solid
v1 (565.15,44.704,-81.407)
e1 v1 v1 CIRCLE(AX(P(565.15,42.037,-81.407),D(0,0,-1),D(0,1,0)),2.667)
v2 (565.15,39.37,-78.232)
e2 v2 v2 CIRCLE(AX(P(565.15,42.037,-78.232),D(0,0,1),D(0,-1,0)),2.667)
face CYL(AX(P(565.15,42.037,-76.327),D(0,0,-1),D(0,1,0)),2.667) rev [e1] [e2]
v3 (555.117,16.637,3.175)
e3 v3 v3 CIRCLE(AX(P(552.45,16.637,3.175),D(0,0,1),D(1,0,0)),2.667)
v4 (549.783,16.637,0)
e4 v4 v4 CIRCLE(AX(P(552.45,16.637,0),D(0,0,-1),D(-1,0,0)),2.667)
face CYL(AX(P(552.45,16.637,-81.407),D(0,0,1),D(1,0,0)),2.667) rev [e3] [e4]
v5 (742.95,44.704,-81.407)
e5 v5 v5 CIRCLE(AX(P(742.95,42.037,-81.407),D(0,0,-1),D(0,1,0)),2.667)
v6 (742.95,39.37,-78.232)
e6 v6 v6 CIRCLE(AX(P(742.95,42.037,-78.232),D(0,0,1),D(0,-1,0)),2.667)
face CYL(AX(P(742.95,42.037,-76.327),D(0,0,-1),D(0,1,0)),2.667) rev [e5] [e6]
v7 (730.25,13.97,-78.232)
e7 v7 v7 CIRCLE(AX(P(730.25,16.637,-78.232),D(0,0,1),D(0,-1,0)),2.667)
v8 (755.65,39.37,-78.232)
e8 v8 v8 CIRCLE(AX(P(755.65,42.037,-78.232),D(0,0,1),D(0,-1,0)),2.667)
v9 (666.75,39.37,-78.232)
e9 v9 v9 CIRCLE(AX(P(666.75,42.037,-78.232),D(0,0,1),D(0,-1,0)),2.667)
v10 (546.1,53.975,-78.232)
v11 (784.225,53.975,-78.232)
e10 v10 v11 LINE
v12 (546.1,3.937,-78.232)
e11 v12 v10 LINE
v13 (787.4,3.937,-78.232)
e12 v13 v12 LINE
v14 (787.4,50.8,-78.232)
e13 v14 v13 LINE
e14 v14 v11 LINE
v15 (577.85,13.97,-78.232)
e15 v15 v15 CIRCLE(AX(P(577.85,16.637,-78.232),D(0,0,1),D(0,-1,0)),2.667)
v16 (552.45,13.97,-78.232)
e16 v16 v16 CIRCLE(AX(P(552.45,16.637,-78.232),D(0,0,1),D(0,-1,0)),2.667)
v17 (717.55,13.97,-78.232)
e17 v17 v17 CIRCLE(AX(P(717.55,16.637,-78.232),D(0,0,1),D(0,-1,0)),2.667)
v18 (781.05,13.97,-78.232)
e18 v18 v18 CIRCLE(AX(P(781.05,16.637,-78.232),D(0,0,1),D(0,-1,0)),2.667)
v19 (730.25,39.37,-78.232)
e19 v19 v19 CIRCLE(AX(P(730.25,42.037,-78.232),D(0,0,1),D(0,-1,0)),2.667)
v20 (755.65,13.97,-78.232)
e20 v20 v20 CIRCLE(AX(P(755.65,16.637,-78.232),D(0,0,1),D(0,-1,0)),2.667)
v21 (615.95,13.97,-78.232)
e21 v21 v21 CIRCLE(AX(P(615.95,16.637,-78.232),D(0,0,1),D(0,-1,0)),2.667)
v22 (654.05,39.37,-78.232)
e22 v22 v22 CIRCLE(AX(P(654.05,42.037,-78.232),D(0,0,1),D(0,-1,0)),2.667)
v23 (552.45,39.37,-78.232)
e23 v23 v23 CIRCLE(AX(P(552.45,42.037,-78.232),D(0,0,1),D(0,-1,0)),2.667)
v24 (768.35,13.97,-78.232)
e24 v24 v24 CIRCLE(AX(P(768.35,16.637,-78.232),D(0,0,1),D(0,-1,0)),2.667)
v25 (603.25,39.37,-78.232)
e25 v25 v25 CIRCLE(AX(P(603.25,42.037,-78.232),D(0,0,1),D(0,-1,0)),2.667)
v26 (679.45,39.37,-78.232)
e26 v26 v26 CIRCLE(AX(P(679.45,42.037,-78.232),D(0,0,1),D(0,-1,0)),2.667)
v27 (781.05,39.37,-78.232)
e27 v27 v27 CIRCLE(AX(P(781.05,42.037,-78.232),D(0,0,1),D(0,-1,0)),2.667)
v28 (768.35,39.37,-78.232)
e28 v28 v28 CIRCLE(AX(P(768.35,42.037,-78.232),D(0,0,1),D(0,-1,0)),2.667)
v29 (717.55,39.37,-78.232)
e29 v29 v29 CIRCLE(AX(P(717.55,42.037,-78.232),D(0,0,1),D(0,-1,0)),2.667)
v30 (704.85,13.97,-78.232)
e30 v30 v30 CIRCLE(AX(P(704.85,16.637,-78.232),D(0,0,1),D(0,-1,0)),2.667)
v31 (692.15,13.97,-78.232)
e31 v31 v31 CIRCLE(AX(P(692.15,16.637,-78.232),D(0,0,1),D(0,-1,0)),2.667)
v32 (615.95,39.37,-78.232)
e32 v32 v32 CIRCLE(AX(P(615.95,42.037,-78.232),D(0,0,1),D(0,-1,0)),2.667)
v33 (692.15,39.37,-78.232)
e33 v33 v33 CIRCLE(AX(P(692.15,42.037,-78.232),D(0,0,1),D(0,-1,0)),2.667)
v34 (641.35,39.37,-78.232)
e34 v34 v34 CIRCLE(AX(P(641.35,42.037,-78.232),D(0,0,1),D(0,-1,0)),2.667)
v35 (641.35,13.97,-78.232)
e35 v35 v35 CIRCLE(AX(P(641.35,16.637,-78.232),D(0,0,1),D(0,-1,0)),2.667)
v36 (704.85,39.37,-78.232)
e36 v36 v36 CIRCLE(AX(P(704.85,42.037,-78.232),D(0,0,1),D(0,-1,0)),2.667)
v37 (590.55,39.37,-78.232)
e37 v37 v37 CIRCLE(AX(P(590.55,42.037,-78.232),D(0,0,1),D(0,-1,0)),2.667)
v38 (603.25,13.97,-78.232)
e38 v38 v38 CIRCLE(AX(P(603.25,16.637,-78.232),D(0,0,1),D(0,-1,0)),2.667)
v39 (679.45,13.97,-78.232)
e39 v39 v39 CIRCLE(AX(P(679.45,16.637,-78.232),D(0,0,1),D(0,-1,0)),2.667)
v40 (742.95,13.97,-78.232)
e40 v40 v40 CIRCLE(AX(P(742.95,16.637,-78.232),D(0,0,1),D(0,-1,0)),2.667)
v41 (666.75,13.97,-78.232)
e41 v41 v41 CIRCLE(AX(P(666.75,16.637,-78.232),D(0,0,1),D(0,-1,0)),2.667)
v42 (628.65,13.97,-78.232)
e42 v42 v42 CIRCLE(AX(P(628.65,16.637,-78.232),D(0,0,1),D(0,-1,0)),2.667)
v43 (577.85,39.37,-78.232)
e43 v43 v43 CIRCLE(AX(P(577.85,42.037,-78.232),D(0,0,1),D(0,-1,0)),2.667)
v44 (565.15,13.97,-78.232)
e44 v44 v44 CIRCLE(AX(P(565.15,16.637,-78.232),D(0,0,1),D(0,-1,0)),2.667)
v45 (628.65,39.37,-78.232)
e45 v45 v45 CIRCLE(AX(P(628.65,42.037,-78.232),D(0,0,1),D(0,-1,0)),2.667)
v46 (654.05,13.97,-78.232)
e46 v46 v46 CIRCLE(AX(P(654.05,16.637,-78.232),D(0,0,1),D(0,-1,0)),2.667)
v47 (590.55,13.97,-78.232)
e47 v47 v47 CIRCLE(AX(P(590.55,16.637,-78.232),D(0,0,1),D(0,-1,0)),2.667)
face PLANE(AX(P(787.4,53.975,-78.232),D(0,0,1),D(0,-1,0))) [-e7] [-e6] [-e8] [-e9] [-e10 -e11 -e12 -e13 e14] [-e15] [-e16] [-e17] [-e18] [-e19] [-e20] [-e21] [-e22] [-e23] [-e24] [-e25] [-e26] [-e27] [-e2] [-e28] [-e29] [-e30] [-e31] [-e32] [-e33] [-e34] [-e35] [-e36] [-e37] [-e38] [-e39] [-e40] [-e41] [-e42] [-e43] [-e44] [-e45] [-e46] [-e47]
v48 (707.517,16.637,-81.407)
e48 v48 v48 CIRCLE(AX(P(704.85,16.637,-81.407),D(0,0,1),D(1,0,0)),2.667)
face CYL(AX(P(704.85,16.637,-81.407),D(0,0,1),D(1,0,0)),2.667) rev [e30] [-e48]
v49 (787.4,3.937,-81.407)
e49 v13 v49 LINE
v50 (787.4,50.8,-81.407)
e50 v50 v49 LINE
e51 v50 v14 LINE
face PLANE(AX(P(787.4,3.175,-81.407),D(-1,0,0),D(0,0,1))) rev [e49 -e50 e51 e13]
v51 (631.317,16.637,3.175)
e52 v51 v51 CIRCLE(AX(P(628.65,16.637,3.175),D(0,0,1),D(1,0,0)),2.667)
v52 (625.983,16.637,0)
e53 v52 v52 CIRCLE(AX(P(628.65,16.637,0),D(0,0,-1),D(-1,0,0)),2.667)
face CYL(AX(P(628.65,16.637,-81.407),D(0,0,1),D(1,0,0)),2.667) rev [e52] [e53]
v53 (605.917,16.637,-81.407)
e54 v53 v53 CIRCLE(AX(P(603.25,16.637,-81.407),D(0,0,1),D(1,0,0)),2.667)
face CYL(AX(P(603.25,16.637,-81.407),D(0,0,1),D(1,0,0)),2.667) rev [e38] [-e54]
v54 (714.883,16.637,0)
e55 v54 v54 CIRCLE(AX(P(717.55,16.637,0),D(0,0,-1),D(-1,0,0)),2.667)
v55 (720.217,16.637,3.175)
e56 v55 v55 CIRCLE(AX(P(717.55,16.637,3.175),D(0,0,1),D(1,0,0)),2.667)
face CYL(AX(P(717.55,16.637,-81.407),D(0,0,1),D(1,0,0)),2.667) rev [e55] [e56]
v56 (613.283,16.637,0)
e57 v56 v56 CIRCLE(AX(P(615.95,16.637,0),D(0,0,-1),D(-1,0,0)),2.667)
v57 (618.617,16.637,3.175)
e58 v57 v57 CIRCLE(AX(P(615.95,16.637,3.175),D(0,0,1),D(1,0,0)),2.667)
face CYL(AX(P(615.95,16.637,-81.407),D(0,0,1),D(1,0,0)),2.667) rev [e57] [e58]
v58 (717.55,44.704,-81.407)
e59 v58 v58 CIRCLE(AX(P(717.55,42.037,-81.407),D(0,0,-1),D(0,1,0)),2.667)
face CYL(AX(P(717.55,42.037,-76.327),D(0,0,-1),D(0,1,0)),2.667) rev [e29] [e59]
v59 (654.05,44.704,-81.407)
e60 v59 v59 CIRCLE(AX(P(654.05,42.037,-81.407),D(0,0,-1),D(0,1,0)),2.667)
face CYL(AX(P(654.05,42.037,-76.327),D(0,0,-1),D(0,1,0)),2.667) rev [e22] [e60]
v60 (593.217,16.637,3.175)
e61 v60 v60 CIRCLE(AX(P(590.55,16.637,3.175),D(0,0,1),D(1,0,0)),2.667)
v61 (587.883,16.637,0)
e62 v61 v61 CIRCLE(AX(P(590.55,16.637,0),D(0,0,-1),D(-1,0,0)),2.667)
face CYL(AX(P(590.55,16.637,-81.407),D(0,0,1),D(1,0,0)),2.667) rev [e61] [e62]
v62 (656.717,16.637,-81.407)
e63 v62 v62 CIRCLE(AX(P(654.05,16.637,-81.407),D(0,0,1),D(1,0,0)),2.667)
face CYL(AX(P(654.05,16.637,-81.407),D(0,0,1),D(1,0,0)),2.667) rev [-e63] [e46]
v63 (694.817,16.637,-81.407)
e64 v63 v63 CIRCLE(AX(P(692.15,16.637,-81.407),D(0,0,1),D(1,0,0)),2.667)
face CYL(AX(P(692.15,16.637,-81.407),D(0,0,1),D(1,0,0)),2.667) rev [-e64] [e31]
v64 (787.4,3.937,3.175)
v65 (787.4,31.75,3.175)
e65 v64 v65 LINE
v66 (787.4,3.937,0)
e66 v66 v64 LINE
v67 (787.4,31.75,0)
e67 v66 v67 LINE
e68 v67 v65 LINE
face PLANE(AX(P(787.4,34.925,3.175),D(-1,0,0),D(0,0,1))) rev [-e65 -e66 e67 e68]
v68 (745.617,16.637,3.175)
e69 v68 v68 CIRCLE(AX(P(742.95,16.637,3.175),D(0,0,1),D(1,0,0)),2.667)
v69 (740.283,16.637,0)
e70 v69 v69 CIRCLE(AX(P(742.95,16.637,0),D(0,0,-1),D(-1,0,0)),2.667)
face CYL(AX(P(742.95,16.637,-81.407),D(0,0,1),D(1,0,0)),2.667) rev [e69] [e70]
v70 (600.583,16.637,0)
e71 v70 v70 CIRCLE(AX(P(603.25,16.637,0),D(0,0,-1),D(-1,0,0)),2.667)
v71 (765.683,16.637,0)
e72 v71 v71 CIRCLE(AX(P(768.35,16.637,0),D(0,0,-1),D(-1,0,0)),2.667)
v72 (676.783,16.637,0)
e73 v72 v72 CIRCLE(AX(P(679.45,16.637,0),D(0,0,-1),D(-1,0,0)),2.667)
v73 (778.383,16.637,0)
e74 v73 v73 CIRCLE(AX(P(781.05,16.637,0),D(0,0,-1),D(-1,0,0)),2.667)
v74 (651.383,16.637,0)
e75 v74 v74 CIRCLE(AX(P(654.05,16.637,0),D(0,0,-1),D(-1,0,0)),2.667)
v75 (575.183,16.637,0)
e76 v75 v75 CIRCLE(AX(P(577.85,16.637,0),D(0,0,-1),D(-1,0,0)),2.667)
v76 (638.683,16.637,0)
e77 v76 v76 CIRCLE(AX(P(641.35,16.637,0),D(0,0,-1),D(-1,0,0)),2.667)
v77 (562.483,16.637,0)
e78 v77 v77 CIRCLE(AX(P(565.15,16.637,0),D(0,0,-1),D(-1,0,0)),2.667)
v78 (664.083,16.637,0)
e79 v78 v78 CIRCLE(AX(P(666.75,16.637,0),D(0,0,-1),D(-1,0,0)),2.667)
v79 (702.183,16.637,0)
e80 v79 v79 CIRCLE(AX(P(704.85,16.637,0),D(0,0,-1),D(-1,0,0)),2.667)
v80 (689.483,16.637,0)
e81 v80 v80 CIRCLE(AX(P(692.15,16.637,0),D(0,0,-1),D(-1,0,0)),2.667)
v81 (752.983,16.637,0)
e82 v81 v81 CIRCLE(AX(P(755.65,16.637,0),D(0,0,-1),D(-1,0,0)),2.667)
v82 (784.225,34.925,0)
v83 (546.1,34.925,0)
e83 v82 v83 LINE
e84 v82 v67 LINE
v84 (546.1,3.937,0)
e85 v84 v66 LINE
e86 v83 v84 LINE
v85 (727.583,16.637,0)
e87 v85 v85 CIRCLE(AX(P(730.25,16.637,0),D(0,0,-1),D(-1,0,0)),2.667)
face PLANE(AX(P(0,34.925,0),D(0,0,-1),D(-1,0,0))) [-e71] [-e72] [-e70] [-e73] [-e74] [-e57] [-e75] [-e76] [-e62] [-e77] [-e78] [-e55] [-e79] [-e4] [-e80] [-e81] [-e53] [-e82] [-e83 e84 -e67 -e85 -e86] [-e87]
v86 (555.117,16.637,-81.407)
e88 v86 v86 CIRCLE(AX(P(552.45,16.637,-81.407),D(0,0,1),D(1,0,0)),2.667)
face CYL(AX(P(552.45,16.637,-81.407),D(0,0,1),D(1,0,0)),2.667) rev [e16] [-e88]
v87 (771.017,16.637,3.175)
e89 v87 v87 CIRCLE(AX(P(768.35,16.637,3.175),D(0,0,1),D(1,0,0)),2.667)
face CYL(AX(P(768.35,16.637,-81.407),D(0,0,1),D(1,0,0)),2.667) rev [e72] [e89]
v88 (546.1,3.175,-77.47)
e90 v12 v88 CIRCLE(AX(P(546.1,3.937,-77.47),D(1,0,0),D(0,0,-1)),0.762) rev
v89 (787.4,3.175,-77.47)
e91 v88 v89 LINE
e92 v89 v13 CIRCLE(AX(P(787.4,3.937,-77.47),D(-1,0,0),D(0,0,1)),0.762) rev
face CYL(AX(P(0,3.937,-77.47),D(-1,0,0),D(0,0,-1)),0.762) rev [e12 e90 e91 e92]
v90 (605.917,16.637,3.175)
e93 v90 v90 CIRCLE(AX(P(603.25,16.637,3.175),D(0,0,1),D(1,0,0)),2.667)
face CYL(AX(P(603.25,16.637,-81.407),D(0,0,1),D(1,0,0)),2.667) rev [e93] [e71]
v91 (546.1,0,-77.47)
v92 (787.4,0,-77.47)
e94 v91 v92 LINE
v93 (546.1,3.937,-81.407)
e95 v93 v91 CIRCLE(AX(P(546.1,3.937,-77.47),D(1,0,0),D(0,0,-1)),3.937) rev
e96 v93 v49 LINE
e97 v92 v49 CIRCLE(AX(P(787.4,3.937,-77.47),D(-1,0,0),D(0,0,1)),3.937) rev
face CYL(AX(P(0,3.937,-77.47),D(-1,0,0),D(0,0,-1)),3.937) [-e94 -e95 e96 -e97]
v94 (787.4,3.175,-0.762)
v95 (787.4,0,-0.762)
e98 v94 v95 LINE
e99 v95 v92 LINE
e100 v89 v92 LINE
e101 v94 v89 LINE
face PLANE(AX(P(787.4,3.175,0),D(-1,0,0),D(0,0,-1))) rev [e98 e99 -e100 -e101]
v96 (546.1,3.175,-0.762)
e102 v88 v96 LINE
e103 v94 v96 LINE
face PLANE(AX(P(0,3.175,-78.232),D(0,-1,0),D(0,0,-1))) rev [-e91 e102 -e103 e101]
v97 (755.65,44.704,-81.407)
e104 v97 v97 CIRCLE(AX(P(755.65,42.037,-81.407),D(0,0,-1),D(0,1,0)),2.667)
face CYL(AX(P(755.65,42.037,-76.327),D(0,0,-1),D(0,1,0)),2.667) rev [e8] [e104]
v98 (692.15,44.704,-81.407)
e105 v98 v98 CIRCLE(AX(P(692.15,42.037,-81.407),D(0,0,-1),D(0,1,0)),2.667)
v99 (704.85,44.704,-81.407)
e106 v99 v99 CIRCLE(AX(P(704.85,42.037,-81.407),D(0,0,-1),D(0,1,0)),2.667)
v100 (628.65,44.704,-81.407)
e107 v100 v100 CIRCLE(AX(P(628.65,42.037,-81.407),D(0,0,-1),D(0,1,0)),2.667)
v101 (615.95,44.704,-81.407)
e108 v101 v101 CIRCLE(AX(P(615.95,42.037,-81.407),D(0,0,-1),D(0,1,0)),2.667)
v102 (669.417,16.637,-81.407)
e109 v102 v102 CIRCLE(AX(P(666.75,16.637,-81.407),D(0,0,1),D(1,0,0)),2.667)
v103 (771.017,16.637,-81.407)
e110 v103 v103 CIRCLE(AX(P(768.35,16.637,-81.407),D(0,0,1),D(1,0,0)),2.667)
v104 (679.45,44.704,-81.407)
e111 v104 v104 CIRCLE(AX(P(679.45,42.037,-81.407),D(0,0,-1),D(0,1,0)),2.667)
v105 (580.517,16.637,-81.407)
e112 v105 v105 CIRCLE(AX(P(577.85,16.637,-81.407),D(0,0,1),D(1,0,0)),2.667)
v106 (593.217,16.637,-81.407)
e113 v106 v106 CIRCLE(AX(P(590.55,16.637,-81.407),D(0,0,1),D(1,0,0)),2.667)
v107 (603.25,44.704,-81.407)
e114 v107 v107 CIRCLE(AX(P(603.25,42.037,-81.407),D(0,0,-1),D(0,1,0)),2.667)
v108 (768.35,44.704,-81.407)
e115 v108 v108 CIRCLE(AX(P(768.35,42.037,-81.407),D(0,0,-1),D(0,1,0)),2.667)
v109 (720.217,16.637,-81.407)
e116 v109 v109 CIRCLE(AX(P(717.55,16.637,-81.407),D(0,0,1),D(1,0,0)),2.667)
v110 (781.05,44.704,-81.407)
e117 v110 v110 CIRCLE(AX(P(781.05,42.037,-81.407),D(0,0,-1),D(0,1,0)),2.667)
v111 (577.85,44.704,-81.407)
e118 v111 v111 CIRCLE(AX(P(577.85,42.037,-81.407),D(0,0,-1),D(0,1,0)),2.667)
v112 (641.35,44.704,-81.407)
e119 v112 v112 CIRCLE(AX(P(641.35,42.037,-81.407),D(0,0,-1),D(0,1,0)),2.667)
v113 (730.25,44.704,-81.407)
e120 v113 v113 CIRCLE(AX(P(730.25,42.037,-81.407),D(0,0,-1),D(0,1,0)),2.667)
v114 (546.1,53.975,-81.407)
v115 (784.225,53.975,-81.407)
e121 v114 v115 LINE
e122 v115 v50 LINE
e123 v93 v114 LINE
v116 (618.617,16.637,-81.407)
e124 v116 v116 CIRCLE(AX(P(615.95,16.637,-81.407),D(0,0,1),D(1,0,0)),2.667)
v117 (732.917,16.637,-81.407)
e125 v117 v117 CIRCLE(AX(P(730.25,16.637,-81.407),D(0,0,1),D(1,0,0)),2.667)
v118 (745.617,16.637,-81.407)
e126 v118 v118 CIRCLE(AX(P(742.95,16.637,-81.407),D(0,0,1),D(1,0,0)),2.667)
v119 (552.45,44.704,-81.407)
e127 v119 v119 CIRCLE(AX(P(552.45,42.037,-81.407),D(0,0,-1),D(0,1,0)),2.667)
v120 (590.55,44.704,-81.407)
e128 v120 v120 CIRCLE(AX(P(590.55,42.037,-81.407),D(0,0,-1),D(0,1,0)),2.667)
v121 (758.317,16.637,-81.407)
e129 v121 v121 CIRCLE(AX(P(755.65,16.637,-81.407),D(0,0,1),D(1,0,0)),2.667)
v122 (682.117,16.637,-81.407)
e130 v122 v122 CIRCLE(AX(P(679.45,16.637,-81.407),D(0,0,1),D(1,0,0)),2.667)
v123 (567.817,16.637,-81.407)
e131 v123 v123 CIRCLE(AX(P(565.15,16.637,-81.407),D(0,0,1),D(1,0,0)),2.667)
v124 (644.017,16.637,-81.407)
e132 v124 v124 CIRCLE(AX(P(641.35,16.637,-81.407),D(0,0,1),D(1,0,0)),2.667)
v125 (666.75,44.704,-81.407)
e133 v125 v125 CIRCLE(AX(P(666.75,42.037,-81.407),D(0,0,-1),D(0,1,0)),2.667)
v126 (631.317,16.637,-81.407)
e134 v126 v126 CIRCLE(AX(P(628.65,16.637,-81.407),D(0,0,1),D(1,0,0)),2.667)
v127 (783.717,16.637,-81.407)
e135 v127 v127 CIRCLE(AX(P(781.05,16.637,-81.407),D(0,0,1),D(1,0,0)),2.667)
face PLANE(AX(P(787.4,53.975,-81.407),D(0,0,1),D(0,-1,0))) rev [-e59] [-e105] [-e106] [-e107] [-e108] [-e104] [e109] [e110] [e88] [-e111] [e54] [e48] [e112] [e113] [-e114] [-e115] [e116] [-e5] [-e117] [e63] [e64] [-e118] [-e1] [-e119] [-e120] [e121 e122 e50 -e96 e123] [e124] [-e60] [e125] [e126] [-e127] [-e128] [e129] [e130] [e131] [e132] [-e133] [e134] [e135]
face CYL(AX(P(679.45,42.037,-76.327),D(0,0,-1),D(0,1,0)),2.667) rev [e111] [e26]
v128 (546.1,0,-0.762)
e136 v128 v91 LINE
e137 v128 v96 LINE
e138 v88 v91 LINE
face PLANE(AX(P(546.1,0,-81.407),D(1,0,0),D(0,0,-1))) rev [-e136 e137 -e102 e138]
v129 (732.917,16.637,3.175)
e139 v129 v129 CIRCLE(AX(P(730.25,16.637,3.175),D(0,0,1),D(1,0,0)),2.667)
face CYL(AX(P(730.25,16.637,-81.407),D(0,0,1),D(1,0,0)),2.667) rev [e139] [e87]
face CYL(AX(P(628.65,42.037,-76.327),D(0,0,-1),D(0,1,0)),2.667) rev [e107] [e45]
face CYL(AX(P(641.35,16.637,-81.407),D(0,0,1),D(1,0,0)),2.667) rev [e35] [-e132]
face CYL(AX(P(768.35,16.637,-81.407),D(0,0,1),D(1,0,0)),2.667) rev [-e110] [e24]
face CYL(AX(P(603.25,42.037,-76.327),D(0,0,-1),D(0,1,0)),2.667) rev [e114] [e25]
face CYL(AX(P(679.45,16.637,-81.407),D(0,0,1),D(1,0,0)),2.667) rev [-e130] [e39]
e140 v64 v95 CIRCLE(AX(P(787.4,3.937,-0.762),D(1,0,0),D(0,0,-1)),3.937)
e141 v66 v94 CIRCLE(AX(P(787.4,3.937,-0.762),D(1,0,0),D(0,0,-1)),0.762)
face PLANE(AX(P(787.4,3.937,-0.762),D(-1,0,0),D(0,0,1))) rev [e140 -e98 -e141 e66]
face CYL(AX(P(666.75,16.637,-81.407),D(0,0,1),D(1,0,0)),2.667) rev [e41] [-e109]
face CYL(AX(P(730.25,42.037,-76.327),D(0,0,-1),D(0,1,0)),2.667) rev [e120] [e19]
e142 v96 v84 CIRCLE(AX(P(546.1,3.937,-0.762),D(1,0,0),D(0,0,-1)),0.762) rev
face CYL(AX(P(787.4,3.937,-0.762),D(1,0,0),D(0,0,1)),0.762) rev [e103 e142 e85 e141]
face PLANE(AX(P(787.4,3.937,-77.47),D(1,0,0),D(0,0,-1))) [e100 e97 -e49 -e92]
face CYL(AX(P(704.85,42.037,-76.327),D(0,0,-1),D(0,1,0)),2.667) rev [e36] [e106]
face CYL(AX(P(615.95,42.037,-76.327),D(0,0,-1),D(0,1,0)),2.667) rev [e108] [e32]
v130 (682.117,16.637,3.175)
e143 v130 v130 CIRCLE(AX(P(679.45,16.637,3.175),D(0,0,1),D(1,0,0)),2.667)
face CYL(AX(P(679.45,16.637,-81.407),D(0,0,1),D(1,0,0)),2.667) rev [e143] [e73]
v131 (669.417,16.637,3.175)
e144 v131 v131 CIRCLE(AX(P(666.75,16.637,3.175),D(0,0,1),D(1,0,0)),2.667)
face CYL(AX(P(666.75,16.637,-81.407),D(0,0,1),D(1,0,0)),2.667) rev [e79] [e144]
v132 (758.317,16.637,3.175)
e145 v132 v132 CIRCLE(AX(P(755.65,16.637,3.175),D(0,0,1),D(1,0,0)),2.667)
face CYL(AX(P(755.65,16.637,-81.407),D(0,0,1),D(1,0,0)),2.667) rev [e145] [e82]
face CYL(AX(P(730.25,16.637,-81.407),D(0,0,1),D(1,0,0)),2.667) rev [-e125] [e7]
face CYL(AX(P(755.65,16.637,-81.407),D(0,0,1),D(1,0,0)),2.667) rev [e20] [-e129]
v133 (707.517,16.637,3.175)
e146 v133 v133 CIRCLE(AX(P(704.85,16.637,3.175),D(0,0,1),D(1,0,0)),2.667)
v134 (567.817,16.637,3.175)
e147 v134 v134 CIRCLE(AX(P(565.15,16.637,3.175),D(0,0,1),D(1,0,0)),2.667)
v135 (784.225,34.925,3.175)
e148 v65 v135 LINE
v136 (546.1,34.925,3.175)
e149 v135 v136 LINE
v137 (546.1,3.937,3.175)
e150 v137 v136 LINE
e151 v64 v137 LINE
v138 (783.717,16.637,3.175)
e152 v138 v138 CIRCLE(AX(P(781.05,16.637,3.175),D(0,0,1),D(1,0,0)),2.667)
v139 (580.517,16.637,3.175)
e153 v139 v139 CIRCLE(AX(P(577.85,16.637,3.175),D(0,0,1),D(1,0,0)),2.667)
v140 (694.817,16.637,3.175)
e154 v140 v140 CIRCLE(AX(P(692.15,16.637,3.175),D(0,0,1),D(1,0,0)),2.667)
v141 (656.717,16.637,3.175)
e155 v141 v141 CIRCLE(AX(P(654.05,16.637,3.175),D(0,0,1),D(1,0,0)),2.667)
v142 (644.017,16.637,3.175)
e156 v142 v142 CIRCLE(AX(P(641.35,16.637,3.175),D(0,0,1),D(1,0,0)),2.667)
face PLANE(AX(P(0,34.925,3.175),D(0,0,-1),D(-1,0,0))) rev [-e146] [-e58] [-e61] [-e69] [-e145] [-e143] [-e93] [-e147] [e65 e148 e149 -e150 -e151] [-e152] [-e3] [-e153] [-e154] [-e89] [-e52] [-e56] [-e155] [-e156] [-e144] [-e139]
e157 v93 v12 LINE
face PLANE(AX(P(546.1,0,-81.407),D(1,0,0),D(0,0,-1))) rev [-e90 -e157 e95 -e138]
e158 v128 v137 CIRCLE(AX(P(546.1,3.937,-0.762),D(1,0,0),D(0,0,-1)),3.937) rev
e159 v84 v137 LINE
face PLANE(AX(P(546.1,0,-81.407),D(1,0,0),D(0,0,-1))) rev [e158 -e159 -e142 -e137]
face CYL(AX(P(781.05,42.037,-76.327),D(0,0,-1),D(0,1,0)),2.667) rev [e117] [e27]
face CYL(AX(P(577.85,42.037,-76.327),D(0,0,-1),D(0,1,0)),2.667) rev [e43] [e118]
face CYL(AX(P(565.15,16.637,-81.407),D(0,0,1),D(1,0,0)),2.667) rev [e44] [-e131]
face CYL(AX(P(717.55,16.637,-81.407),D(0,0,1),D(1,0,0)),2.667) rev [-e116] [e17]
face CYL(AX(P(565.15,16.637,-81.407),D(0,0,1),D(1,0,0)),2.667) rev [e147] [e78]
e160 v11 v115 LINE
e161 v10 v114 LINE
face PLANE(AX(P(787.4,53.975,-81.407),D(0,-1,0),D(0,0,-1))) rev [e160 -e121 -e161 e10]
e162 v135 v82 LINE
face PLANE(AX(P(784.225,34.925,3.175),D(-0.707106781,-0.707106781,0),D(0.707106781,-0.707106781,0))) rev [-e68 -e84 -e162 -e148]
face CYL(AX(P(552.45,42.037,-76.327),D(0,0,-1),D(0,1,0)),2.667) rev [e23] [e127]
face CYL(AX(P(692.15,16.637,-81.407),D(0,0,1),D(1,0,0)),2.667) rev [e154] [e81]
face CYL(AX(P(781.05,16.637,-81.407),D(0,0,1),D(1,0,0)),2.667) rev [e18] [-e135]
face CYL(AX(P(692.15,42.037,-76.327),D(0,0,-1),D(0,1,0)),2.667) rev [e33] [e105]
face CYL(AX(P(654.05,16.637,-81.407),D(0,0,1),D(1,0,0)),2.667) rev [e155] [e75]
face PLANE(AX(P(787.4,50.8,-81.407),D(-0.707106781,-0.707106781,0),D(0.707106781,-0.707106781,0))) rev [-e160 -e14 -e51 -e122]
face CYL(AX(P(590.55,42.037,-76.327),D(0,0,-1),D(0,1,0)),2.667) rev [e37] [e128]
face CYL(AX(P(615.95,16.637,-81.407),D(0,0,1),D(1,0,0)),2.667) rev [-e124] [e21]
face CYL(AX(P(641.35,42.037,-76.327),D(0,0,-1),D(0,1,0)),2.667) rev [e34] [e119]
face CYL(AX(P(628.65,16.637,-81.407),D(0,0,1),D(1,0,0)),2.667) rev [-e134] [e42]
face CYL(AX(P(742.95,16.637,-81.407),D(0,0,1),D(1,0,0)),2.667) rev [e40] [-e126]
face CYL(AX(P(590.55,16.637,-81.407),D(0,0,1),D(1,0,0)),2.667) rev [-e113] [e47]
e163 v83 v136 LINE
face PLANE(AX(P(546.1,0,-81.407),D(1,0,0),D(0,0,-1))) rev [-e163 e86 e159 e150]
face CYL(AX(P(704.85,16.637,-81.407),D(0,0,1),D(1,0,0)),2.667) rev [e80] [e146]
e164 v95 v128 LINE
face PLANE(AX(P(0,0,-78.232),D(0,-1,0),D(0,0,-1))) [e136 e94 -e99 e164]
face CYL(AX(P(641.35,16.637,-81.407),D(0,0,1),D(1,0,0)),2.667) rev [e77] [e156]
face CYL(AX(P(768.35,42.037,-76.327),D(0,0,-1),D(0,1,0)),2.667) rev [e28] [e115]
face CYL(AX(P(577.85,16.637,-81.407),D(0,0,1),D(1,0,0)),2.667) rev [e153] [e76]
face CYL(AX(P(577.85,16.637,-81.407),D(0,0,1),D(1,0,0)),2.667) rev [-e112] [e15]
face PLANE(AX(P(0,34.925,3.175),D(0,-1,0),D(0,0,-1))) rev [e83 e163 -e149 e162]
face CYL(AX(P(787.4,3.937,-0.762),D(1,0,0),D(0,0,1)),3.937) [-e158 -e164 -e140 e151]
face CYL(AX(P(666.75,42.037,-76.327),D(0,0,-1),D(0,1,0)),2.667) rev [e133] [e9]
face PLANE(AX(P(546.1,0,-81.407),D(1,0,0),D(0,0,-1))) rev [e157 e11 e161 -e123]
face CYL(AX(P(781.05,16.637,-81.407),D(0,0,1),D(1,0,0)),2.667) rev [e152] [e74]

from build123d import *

# Parameters (mm, degrees)
SKETCH1_W                    = 787.4
SKETCH1_H                    = 78.232
BOSS_EXTRUDE1_DEPTH          = 3.175
EDGE_FLANGE1_STRIP_W         = 14.224
EDGE_FLANGE1_STRIP_H         = 3.175
EDGE_FLANGE1_STRIP_CUT_DEPTH = 787.4
EDGE_FLANGE1_DEPTH           = 787.4
EDGE_FLANGE2_STRIP_W         = 14.224
EDGE_FLANGE2_STRIP_H         = 3.175
EDGE_FLANGE2_STRIP_CUT_DEPTH = 787.4
EDGE_FLANGE2_DEPTH           = 787.4
SKETCH9_R                    = 2.667
CUT_EXTRUDE1_DEPTH           = 794.767078776
CHAMFER1_SIZE                = 3.175
LPATTERN1_COUNT              = 62
LPATTERN1_PITCH              = 12.7
SKETCH12_R                   = 1.27
CUT_EXTRUDE4_DEPTH           = 794.225377588
SKETCH14_R                   = 2.667
CUT_EXTRUDE6_DEPTH           = 5.08
LPATTERN4_COUNT              = 62
LPATTERN4_PITCH              = 12.7
SKETCH15_W                   = 546.1
SKETCH15_H                   = 84.582
CUT_EXTRUDE7_DEPTH           = 794.435038471


# Sheet-metal steps are written as plain solids
with BuildPart() as part:
    # Sketch1 → Boss-Extrude1 (new body)
    with BuildSketch(Plane(origin=(0, 0, 0), x_dir=(1, 0, 0), z_dir=(0, 1, 0))):
        with Locations((393.7, 39.116)):
            Rectangle(SKETCH1_W, SKETCH1_H)
    extrude(amount=BOSS_EXTRUDE1_DEPTH)

    # Edge-Flange1 strip (across the edge) → Edge-Flange1 strip cut (cut)
    with BuildSketch(Plane(origin=(787.4, 3.175, -78.232), x_dir=(0, 0, 1), z_dir=(-1, 0, 0))):
        with Locations((-6.35, -1.5875)):
            Rectangle(EDGE_FLANGE1_STRIP_W, EDGE_FLANGE1_STRIP_H)
    extrude(amount=EDGE_FLANGE1_STRIP_CUT_DEPTH, mode=Mode.SUBTRACT)

    # Edge-Flange1 section (across the edge) → Edge-Flange1 (add)
    with BuildSketch(Plane(origin=(787.4, 3.175, -78.232), x_dir=(0, 0, 1), z_dir=(-1, 0, 0))):
        with BuildLine():
            Line((-3.175, 0.762), (-3.175, 50.8))
            Line((-3.175, 50.8), (0, 50.8))
            Line((0, 50.8), (0, 0.762))
            ThreePointArc((0, 0.762), (0.223184633, 0.223184633), (0.762, 0))
            Line((0.762, 0), (0.762, -3.175))
            ThreePointArc((0.762, -3.175), (-2.021879398, -2.021879398), (-3.175, 0.762))
        make_face()
    extrude(amount=EDGE_FLANGE1_DEPTH)

    # Edge-Flange2 strip (across the edge) → Edge-Flange2 strip cut (cut)
    with BuildSketch(Plane(origin=(0, 3.175, 0), x_dir=(0, 0, -1), z_dir=(1, 0, 0))):
        with Locations((-6.35, -1.5875)):
            Rectangle(EDGE_FLANGE2_STRIP_W, EDGE_FLANGE2_STRIP_H)
    extrude(amount=EDGE_FLANGE2_STRIP_CUT_DEPTH, mode=Mode.SUBTRACT)

    # Edge-Flange2 section (across the edge) → Edge-Flange2 (add)
    with BuildSketch(Plane(origin=(0, 3.175, 0), x_dir=(0, 0, -1), z_dir=(1, 0, 0))):
        with BuildLine():
            Line((-3.175, 0.762), (-3.175, 31.75))
            Line((-3.175, 31.75), (0, 31.75))
            Line((0, 31.75), (0, 0.762))
            ThreePointArc((0, 0.762), (0.223184633, 0.223184633), (0.762, 0))
            Line((0.762, 0), (0.762, -3.175))
            ThreePointArc((0.762, -3.175), (-2.021879398, -2.021879398), (-3.175, 0.762))
        make_face()
    extrude(amount=EDGE_FLANGE2_DEPTH)

    # Sketch9 → Cut-Extrude1 (cut, through all)
    with BuildSketch(Plane.XY.offset(3.175)):
        with Locations((781.05, 16.637)):
            Circle(SKETCH9_R)
    cut_extrude1 = extrude(amount=-CUT_EXTRUDE1_DEPTH, mode=Mode.SUBTRACT)

    # Chamfer1
    chamfer1_edges = [part.edges().sort_by_distance(p)[0] for p in [
        (787.4, 53.975, -79.8195),
        (0, 53.975, -79.8195),
        (0, 34.925, 1.5875),
        (787.4, 34.925, 1.5875),
    ]]
    chamfer(chamfer1_edges, length=CHAMFER1_SIZE)

    # LPattern1: Cut-Extrude1 ×62
    with Locations(*[(-i * LPATTERN1_PITCH, 0, 0) for i in range(1, LPATTERN1_COUNT)]):
        add(cut_extrude1, mode=Mode.SUBTRACT)

    # Sketch12 → Cut-Extrude4 (cut, through all)
    with BuildSketch(Plane(origin=(0, 3.175, 0), x_dir=(1, 0, 0), z_dir=(0, 1, 0))):
        with Locations(Location((101.6, 72.39, 0), (0, 0, 270))):
            Circle(SKETCH12_R)
        with Locations(Location((215.9, 72.39, 0), (0, 0, 270))):
            Circle(SKETCH12_R)
        with Locations(Location((215.9, 5.842, 0), (0, 0, 270))):
            Circle(SKETCH12_R)
        with Locations(Location((101.6, 5.842, 0), (0, 0, 270))):
            Circle(SKETCH12_R)
    extrude(amount=-CUT_EXTRUDE4_DEPTH, mode=Mode.SUBTRACT)

    # Sketch14 → Cut-Extrude6 (cut)
    with BuildSketch(Plane(origin=(0, 0, -81.407), x_dir=(-1, 0, 0), z_dir=(0, 0, -1))):
        with Locations(Location((-781.05, 42.037, 0), (0, 0, 90))):
            Circle(SKETCH14_R)
    cut_extrude6 = extrude(amount=-CUT_EXTRUDE6_DEPTH, mode=Mode.SUBTRACT)

    # LPattern4: Cut-Extrude6 ×62
    with Locations(*[(-i * LPATTERN4_PITCH, 0, 0) for i in range(1, LPATTERN4_COUNT)]):
        add(cut_extrude6, mode=Mode.SUBTRACT)

    # Sketch15 → Cut-Extrude7 (cut, through all)
    with BuildSketch(Plane(origin=(0, 53.975, 0), x_dir=(1, 0, 0), z_dir=(0, 1, 0))):
        with Locations((273.05, 39.116)):
            Rectangle(SKETCH15_W, SKETCH15_H)
    extrude(amount=-CUT_EXTRUDE7_DEPTH, mode=Mode.SUBTRACT)


solid = part.part
